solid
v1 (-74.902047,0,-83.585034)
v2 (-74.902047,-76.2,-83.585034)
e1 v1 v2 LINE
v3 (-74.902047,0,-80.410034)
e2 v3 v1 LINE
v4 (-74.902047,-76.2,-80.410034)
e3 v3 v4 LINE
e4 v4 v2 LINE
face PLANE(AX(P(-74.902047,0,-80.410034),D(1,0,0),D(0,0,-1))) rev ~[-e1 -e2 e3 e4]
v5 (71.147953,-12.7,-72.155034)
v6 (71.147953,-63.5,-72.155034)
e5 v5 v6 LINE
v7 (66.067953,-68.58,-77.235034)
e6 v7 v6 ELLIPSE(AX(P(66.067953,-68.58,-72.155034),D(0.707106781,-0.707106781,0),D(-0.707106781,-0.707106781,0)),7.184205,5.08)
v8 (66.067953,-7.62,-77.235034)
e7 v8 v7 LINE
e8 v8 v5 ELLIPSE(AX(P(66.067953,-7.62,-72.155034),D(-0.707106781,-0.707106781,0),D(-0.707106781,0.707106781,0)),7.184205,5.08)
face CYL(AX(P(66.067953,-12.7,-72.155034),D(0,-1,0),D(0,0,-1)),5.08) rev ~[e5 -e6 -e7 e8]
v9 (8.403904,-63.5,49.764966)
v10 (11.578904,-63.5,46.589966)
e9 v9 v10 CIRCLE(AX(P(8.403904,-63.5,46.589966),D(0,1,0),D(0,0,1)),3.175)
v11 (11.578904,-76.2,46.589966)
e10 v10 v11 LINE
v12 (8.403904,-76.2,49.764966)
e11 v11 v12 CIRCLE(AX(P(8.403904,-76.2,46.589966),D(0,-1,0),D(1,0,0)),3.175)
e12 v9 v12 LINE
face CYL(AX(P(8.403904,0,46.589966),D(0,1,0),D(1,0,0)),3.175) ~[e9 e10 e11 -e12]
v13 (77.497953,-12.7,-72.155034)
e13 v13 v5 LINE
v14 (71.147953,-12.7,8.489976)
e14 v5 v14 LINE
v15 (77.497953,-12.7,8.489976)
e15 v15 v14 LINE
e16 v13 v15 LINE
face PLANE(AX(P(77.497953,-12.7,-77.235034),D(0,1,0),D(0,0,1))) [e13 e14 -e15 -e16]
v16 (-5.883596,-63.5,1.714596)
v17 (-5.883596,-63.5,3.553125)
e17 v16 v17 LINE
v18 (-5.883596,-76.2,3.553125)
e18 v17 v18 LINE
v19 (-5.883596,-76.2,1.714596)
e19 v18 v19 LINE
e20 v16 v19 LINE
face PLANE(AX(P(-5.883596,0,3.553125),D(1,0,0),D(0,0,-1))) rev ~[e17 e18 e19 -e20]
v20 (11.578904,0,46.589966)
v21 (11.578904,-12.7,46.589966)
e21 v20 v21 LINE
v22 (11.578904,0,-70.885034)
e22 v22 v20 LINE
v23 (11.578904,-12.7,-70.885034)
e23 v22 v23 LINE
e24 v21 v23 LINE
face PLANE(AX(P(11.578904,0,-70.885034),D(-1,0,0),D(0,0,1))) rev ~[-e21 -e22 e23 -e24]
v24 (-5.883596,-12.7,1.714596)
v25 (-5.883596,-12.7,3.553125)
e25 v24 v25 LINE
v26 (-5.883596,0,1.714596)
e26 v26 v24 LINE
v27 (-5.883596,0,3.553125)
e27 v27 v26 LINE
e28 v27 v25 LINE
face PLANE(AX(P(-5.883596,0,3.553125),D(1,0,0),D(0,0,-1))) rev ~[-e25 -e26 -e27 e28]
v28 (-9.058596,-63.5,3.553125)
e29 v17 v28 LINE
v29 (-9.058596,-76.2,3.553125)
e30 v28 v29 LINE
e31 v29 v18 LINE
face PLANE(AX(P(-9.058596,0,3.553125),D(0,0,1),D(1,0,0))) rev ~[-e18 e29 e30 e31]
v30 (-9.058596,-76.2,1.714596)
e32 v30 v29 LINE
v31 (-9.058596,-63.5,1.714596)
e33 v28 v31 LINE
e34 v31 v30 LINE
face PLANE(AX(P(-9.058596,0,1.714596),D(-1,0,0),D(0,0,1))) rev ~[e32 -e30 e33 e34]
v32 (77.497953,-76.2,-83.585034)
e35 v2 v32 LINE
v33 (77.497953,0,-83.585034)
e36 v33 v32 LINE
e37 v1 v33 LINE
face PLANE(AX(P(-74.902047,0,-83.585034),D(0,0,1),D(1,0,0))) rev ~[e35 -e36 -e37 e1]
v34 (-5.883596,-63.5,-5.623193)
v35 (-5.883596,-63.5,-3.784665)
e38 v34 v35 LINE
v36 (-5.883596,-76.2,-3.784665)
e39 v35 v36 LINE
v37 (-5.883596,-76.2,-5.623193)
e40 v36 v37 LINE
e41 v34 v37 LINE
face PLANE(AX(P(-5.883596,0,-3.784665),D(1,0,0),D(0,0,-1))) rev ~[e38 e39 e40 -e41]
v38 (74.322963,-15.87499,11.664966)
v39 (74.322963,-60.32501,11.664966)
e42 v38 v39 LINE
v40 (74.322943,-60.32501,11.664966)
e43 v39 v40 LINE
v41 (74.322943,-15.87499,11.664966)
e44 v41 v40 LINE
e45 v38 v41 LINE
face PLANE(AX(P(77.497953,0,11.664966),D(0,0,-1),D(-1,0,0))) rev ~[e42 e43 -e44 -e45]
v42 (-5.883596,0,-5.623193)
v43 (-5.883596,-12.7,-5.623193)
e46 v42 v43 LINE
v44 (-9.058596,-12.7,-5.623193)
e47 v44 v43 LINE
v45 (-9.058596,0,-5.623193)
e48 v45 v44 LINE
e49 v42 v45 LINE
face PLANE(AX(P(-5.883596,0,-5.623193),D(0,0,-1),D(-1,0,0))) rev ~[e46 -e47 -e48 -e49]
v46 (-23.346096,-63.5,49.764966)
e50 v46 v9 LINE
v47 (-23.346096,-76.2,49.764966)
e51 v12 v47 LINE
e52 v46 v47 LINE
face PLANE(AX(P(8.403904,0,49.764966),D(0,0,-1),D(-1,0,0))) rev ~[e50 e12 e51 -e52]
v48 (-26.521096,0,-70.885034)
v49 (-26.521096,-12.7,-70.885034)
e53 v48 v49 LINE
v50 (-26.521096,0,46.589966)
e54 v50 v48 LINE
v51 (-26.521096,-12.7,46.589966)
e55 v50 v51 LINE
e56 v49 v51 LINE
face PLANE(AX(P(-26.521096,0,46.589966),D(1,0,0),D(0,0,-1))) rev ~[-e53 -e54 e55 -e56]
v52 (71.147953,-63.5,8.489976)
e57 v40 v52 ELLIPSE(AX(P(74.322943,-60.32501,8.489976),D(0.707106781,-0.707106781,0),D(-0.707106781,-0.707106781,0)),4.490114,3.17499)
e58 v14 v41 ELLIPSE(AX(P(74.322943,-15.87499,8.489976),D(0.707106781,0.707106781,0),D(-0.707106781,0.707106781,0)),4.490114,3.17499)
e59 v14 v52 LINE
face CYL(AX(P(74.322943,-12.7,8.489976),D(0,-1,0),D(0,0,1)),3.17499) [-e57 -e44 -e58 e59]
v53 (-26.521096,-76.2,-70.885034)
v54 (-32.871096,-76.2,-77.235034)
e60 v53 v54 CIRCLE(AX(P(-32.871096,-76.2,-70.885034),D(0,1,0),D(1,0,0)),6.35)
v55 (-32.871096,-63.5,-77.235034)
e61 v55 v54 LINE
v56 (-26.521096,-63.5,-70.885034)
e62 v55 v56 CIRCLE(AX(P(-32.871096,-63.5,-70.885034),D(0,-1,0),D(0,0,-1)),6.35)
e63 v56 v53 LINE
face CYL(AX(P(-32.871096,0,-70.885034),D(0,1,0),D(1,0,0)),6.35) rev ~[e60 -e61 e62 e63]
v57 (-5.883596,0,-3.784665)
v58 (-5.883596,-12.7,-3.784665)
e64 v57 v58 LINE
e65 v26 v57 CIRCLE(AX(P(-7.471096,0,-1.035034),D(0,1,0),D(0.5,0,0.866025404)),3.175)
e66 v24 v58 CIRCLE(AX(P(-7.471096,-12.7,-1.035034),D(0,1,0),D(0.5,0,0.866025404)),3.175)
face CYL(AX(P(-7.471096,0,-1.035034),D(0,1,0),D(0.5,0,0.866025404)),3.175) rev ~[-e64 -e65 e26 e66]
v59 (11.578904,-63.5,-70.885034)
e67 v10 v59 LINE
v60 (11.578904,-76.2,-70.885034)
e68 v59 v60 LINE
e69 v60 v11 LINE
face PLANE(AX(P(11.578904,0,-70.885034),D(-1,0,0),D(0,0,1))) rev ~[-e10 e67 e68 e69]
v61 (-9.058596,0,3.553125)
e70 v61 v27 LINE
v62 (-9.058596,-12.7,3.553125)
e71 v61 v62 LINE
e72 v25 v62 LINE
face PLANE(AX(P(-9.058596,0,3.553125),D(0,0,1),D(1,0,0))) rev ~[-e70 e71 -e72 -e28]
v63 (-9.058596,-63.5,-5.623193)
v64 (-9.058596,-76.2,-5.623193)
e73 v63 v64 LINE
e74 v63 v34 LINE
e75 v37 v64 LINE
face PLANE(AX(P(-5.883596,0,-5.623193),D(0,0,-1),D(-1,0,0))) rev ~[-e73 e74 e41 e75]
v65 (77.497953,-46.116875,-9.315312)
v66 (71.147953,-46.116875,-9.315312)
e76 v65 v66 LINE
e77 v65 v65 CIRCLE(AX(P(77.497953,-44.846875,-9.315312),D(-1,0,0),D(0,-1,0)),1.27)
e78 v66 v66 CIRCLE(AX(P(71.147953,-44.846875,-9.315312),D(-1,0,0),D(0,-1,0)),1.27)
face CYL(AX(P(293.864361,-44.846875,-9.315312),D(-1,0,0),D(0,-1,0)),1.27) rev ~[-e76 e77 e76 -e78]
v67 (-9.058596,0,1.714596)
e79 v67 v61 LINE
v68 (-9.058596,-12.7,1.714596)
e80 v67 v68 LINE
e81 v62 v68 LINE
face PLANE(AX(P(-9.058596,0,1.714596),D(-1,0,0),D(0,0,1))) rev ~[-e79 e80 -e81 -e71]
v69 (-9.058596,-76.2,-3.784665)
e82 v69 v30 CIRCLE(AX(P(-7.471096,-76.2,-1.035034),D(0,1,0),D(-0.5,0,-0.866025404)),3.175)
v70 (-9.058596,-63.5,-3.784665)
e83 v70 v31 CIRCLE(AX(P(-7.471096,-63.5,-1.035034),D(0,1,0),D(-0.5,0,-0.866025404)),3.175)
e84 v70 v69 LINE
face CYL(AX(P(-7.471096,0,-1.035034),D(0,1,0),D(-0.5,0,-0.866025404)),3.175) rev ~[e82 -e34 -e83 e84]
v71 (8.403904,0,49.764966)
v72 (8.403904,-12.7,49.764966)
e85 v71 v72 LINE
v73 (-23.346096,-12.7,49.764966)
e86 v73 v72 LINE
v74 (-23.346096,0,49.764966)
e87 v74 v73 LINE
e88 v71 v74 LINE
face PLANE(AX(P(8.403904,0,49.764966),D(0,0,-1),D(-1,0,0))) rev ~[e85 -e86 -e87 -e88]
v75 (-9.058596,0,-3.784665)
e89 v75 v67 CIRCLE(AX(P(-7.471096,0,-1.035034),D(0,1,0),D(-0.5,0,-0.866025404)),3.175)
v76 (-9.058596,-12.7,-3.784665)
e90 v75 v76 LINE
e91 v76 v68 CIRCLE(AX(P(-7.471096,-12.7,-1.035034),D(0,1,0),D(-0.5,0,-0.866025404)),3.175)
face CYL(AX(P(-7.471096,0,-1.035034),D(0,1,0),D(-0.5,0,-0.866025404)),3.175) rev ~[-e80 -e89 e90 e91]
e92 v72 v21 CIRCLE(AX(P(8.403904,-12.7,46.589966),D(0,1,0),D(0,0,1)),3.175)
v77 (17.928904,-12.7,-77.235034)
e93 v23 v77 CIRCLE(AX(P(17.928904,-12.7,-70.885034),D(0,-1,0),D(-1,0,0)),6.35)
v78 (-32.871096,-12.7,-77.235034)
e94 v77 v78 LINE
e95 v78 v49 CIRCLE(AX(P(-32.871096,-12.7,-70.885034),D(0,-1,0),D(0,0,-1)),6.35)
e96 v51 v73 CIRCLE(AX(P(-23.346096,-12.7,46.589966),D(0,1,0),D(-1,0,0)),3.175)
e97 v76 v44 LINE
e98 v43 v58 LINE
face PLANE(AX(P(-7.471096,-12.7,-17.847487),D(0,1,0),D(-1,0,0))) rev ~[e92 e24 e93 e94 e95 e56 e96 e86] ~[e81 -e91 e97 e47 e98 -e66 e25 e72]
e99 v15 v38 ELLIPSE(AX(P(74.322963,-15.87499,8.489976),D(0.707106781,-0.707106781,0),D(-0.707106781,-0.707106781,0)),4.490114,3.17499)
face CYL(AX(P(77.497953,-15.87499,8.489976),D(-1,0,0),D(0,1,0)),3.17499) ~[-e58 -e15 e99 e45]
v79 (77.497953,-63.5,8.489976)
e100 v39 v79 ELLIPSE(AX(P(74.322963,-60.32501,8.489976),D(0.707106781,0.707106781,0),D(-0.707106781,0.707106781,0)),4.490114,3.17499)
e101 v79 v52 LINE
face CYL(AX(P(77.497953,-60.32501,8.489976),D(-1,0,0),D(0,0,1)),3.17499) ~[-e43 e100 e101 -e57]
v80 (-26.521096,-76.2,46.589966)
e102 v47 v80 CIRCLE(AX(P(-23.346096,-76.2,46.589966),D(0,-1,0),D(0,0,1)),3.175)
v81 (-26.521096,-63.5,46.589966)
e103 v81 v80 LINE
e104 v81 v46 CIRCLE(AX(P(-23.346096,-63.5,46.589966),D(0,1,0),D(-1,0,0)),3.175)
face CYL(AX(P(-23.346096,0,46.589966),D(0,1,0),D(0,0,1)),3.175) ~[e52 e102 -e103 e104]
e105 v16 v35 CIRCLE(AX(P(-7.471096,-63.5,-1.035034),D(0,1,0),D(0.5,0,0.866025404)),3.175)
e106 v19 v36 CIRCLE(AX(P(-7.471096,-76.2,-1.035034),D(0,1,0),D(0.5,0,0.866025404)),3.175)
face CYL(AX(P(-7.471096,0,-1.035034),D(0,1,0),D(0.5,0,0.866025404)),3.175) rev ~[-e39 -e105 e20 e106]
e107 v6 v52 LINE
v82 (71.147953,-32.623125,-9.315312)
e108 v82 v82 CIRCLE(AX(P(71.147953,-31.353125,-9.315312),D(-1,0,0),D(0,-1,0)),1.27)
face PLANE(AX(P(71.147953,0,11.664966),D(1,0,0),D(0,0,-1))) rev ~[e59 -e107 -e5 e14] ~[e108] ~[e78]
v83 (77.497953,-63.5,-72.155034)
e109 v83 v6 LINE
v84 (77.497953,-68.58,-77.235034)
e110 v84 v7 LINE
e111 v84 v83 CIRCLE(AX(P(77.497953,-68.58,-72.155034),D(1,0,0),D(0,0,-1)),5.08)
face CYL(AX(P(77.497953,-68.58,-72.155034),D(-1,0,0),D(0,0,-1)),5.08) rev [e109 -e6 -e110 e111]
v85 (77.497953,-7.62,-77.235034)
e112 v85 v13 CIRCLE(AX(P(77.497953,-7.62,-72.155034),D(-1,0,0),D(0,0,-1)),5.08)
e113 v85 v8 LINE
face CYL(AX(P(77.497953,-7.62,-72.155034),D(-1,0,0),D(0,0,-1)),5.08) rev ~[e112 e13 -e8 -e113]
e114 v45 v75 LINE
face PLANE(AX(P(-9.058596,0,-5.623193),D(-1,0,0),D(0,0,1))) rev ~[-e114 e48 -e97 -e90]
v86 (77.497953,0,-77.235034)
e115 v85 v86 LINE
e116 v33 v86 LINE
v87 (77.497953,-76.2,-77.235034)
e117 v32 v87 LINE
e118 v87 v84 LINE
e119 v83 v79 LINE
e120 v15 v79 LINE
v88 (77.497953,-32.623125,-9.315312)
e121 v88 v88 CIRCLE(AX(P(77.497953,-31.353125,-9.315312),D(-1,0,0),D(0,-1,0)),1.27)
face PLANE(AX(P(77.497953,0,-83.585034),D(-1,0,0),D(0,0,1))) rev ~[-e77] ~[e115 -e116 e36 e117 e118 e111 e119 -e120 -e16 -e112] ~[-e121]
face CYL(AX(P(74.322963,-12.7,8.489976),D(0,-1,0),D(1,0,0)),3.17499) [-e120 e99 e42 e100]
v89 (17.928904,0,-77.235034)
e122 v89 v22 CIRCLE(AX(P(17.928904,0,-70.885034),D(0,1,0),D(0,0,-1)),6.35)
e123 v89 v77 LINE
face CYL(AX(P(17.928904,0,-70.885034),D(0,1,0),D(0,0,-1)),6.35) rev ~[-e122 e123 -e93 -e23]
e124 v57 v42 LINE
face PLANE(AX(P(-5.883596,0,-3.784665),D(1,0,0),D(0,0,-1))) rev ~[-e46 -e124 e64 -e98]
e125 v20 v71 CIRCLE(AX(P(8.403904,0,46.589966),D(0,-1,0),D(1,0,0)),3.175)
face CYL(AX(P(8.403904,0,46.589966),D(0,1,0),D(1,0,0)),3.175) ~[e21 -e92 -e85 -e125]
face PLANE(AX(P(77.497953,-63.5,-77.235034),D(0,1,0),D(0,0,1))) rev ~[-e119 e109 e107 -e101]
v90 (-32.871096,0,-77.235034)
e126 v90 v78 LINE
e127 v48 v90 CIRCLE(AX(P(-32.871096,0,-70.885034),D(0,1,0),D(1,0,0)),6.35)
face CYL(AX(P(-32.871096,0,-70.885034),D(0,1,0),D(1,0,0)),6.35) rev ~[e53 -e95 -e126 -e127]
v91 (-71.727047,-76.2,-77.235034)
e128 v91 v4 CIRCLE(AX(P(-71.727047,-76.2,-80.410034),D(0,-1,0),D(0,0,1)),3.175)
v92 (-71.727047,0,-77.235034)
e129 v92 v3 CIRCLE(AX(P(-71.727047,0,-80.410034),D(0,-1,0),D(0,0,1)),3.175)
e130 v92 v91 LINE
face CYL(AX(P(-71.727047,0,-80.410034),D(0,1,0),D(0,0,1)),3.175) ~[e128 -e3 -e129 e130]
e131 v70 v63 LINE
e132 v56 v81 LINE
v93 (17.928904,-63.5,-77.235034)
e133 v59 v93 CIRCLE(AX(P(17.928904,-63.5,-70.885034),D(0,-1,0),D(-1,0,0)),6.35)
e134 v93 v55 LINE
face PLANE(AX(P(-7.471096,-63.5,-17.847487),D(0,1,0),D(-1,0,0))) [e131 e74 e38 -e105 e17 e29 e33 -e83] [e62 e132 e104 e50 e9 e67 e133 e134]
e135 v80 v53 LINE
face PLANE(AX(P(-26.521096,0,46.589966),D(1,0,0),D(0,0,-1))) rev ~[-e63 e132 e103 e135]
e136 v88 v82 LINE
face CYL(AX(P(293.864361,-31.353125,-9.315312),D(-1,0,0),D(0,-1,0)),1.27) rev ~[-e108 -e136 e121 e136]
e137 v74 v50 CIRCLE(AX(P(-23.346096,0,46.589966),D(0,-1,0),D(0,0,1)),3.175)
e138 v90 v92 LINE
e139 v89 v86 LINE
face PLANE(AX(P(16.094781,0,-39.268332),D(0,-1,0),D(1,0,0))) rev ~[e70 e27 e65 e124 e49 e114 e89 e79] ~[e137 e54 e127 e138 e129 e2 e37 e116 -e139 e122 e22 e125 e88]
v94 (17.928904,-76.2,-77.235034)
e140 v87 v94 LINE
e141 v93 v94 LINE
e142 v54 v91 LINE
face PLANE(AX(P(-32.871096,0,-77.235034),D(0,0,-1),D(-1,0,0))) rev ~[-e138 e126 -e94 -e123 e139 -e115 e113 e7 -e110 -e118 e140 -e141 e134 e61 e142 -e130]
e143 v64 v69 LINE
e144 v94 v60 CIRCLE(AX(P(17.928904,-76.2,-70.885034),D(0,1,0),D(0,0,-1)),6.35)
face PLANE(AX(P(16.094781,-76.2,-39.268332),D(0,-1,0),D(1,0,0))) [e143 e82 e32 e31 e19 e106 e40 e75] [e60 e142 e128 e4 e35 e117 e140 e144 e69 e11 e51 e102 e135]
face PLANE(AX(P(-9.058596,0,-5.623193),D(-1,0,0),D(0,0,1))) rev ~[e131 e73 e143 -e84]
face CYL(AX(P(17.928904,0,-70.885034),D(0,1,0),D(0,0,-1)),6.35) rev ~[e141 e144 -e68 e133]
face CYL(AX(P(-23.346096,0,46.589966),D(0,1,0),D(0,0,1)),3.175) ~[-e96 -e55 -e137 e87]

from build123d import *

# Parameters (mm, degrees)
F1_DEPTH = 76.2
F4_DEPTH = 50.8
F7_D     = 2.54
F6_W     = 12.7
F6_H     = 88.9
F8_DEPTH = 6.35
F9_R     = 5.08
F10_R    = 3.17499


# Not quite as in the source:
# - a fillet or chamfer is up to 0.001 mm smaller than in the source, because OpenCascade refuses the exact size


with BuildPart() as f1:
    # F0 (on Front) → F1 (new body)
    with BuildSketch(Plane.XZ):
        with BuildLine():
            Line((-74.9020473927, -80.410034281), (-74.9020473927, -83.585034281))
            Line((-74.9020473927, -83.585034281), (77.4979526073, -83.585034281))
            Line((77.4979526073, -83.585034281), (77.4979526073, -77.235034281))
            Line((77.4979526073, -77.235034281), (77.4979526073, 11.664965719))
            Line((77.4979526073, 11.664965719), (71.1479526073, 11.664965719))
            Line((71.1479526073, 11.664965719), (71.1479526073, -77.235034281))
            Line((71.1479526073, -77.235034281), (17.9289044716, -77.235034281))
            ThreePointArc((17.9289044716, -77.235034281), (13.4387764111, -75.3751623415), (11.5789044716, -70.885034281))
            Line((11.5789044716, -70.885034281), (11.5789044716, 46.589965719))
            ThreePointArc((11.5789044716, 46.589965719), (10.6489685019, 48.8350297493), (8.4039044716, 49.764965719))
            Line((8.4039044716, 49.764965719), (-23.3460955284, 49.764965719))
            ThreePointArc((-23.3460955284, 49.764965719), (-25.5911595586, 48.8350297493), (-26.5210955284, 46.589965719))
            Line((-26.5210955284, 46.589965719), (-26.5210955284, -70.885034281))
            ThreePointArc((-26.5210955284, -70.885034281), (-28.3809674678, -75.3751623415), (-32.8710955284, -77.235034281))
            Line((-32.8710955284, -77.235034281), (-71.7270473927, -77.235034281))
            ThreePointArc((-71.7270473927, -77.235034281), (-73.972111423, -78.1649702507), (-74.9020473927, -80.410034281))
        make_face()
        with BuildLine():
            ThreePointArc((-9.0585955284, -3.784664938), (-10.6460955284, -1.035034281), (-9.0585955284, 1.714596376))
            Line((-9.0585955284, 1.714596376), (-9.0585955284, 3.553124576))
            Line((-9.0585955284, 3.553124576), (-5.8835955284, 3.553124576))
            Line((-5.8835955284, 3.553124576), (-5.8835955284, 1.714596376))
            ThreePointArc((-5.8835955284, 1.714596376), (-4.2960955284, -1.035034281), (-5.8835955284, -3.784664938))
            Line((-5.8835955284, -3.784664938), (-5.8835955284, -5.623193138))
            Line((-5.8835955284, -5.623193138), (-9.0585955284, -5.623193138))
            Line((-9.0585955284, -5.623193138), (-9.0585955284, -3.784664938))
        make_face(mode=Mode.SUBTRACT)
    extrude(amount=F1_DEPTH)

    # F3 (on offset) → F4 (cut, through all)
    with BuildSketch(Plane(origin=(0, -12.7, 0), x_dir=(-1, 0, 0), z_dir=(0, 1, 0))):
        with BuildLine():
            Line((-17.9289044716, -77.235034281), (32.8710955284, -77.235034281))
            ThreePointArc((32.8710955284, -77.235034281), (28.3809674678, -75.3751623415), (26.5210955284, -70.885034281))
            Line((26.5210955284, -70.885034281), (26.5210955284, 46.589965719))
            ThreePointArc((26.5210955284, 46.589965719), (25.5911595586, 48.8350297493), (23.3460955284, 49.764965719))
            Line((23.3460955284, 49.764965719), (-8.4039044716, 49.764965719))
            ThreePointArc((-8.4039044716, 49.764965719), (-10.6489685019, 48.8350297493), (-11.5789044716, 46.589965719))
            Line((-11.5789044716, 46.589965719), (-11.5789044716, -70.885034281))
            ThreePointArc((-11.5789044716, -70.885034281), (-13.4387764111, -75.3751623415), (-17.9289044716, -77.235034281))
        make_face()
    extrude(amount=-F4_DEPTH, mode=Mode.SUBTRACT)

    # F7 (through all)
    with Locations(Plane.YZ.offset(77.4979526073)):
        with Locations((-44.846875, -9.3153121099), (-31.353125, -9.3153121099)):
            Hole(F7_D / 2)

    # F6 (on offset) → F8 (cut)
    with BuildSketch(Plane.YZ.offset(77.4979526073)):
        with Locations((-69.85, -32.785034281)):
            Rectangle(F6_W, F6_H)
        with Locations((-6.35, -32.785034281)):
            Rectangle(F6_W, F6_H)
    extrude(amount=-F8_DEPTH, mode=Mode.SUBTRACT)

    # F9
    f9_edges = [f1.edges().sort_by_distance(p)[0] for p in [
        (74.322953, -12.7, -77.235034),
        (71.147953, -38.1, -77.235034),
        (74.322953, -63.5, -77.235034),
    ]]
    fillet(f9_edges, radius=F9_R)

    # F10 (radius 3.175 in the source; OpenCascade refuses exactly that, so slightly less here)
    f10_edges = [f1.edges().sort_by_distance(p)[0] for p in [
        (74.322953, -63.5, 11.664966),
        (74.322953, -12.7, 11.664966),
        (77.497953, -38.1, 11.664966),
        (71.147953, -38.1, 11.664966),
    ]]
    fillet(f10_edges, radius=F10_R)


solid = f1.part
